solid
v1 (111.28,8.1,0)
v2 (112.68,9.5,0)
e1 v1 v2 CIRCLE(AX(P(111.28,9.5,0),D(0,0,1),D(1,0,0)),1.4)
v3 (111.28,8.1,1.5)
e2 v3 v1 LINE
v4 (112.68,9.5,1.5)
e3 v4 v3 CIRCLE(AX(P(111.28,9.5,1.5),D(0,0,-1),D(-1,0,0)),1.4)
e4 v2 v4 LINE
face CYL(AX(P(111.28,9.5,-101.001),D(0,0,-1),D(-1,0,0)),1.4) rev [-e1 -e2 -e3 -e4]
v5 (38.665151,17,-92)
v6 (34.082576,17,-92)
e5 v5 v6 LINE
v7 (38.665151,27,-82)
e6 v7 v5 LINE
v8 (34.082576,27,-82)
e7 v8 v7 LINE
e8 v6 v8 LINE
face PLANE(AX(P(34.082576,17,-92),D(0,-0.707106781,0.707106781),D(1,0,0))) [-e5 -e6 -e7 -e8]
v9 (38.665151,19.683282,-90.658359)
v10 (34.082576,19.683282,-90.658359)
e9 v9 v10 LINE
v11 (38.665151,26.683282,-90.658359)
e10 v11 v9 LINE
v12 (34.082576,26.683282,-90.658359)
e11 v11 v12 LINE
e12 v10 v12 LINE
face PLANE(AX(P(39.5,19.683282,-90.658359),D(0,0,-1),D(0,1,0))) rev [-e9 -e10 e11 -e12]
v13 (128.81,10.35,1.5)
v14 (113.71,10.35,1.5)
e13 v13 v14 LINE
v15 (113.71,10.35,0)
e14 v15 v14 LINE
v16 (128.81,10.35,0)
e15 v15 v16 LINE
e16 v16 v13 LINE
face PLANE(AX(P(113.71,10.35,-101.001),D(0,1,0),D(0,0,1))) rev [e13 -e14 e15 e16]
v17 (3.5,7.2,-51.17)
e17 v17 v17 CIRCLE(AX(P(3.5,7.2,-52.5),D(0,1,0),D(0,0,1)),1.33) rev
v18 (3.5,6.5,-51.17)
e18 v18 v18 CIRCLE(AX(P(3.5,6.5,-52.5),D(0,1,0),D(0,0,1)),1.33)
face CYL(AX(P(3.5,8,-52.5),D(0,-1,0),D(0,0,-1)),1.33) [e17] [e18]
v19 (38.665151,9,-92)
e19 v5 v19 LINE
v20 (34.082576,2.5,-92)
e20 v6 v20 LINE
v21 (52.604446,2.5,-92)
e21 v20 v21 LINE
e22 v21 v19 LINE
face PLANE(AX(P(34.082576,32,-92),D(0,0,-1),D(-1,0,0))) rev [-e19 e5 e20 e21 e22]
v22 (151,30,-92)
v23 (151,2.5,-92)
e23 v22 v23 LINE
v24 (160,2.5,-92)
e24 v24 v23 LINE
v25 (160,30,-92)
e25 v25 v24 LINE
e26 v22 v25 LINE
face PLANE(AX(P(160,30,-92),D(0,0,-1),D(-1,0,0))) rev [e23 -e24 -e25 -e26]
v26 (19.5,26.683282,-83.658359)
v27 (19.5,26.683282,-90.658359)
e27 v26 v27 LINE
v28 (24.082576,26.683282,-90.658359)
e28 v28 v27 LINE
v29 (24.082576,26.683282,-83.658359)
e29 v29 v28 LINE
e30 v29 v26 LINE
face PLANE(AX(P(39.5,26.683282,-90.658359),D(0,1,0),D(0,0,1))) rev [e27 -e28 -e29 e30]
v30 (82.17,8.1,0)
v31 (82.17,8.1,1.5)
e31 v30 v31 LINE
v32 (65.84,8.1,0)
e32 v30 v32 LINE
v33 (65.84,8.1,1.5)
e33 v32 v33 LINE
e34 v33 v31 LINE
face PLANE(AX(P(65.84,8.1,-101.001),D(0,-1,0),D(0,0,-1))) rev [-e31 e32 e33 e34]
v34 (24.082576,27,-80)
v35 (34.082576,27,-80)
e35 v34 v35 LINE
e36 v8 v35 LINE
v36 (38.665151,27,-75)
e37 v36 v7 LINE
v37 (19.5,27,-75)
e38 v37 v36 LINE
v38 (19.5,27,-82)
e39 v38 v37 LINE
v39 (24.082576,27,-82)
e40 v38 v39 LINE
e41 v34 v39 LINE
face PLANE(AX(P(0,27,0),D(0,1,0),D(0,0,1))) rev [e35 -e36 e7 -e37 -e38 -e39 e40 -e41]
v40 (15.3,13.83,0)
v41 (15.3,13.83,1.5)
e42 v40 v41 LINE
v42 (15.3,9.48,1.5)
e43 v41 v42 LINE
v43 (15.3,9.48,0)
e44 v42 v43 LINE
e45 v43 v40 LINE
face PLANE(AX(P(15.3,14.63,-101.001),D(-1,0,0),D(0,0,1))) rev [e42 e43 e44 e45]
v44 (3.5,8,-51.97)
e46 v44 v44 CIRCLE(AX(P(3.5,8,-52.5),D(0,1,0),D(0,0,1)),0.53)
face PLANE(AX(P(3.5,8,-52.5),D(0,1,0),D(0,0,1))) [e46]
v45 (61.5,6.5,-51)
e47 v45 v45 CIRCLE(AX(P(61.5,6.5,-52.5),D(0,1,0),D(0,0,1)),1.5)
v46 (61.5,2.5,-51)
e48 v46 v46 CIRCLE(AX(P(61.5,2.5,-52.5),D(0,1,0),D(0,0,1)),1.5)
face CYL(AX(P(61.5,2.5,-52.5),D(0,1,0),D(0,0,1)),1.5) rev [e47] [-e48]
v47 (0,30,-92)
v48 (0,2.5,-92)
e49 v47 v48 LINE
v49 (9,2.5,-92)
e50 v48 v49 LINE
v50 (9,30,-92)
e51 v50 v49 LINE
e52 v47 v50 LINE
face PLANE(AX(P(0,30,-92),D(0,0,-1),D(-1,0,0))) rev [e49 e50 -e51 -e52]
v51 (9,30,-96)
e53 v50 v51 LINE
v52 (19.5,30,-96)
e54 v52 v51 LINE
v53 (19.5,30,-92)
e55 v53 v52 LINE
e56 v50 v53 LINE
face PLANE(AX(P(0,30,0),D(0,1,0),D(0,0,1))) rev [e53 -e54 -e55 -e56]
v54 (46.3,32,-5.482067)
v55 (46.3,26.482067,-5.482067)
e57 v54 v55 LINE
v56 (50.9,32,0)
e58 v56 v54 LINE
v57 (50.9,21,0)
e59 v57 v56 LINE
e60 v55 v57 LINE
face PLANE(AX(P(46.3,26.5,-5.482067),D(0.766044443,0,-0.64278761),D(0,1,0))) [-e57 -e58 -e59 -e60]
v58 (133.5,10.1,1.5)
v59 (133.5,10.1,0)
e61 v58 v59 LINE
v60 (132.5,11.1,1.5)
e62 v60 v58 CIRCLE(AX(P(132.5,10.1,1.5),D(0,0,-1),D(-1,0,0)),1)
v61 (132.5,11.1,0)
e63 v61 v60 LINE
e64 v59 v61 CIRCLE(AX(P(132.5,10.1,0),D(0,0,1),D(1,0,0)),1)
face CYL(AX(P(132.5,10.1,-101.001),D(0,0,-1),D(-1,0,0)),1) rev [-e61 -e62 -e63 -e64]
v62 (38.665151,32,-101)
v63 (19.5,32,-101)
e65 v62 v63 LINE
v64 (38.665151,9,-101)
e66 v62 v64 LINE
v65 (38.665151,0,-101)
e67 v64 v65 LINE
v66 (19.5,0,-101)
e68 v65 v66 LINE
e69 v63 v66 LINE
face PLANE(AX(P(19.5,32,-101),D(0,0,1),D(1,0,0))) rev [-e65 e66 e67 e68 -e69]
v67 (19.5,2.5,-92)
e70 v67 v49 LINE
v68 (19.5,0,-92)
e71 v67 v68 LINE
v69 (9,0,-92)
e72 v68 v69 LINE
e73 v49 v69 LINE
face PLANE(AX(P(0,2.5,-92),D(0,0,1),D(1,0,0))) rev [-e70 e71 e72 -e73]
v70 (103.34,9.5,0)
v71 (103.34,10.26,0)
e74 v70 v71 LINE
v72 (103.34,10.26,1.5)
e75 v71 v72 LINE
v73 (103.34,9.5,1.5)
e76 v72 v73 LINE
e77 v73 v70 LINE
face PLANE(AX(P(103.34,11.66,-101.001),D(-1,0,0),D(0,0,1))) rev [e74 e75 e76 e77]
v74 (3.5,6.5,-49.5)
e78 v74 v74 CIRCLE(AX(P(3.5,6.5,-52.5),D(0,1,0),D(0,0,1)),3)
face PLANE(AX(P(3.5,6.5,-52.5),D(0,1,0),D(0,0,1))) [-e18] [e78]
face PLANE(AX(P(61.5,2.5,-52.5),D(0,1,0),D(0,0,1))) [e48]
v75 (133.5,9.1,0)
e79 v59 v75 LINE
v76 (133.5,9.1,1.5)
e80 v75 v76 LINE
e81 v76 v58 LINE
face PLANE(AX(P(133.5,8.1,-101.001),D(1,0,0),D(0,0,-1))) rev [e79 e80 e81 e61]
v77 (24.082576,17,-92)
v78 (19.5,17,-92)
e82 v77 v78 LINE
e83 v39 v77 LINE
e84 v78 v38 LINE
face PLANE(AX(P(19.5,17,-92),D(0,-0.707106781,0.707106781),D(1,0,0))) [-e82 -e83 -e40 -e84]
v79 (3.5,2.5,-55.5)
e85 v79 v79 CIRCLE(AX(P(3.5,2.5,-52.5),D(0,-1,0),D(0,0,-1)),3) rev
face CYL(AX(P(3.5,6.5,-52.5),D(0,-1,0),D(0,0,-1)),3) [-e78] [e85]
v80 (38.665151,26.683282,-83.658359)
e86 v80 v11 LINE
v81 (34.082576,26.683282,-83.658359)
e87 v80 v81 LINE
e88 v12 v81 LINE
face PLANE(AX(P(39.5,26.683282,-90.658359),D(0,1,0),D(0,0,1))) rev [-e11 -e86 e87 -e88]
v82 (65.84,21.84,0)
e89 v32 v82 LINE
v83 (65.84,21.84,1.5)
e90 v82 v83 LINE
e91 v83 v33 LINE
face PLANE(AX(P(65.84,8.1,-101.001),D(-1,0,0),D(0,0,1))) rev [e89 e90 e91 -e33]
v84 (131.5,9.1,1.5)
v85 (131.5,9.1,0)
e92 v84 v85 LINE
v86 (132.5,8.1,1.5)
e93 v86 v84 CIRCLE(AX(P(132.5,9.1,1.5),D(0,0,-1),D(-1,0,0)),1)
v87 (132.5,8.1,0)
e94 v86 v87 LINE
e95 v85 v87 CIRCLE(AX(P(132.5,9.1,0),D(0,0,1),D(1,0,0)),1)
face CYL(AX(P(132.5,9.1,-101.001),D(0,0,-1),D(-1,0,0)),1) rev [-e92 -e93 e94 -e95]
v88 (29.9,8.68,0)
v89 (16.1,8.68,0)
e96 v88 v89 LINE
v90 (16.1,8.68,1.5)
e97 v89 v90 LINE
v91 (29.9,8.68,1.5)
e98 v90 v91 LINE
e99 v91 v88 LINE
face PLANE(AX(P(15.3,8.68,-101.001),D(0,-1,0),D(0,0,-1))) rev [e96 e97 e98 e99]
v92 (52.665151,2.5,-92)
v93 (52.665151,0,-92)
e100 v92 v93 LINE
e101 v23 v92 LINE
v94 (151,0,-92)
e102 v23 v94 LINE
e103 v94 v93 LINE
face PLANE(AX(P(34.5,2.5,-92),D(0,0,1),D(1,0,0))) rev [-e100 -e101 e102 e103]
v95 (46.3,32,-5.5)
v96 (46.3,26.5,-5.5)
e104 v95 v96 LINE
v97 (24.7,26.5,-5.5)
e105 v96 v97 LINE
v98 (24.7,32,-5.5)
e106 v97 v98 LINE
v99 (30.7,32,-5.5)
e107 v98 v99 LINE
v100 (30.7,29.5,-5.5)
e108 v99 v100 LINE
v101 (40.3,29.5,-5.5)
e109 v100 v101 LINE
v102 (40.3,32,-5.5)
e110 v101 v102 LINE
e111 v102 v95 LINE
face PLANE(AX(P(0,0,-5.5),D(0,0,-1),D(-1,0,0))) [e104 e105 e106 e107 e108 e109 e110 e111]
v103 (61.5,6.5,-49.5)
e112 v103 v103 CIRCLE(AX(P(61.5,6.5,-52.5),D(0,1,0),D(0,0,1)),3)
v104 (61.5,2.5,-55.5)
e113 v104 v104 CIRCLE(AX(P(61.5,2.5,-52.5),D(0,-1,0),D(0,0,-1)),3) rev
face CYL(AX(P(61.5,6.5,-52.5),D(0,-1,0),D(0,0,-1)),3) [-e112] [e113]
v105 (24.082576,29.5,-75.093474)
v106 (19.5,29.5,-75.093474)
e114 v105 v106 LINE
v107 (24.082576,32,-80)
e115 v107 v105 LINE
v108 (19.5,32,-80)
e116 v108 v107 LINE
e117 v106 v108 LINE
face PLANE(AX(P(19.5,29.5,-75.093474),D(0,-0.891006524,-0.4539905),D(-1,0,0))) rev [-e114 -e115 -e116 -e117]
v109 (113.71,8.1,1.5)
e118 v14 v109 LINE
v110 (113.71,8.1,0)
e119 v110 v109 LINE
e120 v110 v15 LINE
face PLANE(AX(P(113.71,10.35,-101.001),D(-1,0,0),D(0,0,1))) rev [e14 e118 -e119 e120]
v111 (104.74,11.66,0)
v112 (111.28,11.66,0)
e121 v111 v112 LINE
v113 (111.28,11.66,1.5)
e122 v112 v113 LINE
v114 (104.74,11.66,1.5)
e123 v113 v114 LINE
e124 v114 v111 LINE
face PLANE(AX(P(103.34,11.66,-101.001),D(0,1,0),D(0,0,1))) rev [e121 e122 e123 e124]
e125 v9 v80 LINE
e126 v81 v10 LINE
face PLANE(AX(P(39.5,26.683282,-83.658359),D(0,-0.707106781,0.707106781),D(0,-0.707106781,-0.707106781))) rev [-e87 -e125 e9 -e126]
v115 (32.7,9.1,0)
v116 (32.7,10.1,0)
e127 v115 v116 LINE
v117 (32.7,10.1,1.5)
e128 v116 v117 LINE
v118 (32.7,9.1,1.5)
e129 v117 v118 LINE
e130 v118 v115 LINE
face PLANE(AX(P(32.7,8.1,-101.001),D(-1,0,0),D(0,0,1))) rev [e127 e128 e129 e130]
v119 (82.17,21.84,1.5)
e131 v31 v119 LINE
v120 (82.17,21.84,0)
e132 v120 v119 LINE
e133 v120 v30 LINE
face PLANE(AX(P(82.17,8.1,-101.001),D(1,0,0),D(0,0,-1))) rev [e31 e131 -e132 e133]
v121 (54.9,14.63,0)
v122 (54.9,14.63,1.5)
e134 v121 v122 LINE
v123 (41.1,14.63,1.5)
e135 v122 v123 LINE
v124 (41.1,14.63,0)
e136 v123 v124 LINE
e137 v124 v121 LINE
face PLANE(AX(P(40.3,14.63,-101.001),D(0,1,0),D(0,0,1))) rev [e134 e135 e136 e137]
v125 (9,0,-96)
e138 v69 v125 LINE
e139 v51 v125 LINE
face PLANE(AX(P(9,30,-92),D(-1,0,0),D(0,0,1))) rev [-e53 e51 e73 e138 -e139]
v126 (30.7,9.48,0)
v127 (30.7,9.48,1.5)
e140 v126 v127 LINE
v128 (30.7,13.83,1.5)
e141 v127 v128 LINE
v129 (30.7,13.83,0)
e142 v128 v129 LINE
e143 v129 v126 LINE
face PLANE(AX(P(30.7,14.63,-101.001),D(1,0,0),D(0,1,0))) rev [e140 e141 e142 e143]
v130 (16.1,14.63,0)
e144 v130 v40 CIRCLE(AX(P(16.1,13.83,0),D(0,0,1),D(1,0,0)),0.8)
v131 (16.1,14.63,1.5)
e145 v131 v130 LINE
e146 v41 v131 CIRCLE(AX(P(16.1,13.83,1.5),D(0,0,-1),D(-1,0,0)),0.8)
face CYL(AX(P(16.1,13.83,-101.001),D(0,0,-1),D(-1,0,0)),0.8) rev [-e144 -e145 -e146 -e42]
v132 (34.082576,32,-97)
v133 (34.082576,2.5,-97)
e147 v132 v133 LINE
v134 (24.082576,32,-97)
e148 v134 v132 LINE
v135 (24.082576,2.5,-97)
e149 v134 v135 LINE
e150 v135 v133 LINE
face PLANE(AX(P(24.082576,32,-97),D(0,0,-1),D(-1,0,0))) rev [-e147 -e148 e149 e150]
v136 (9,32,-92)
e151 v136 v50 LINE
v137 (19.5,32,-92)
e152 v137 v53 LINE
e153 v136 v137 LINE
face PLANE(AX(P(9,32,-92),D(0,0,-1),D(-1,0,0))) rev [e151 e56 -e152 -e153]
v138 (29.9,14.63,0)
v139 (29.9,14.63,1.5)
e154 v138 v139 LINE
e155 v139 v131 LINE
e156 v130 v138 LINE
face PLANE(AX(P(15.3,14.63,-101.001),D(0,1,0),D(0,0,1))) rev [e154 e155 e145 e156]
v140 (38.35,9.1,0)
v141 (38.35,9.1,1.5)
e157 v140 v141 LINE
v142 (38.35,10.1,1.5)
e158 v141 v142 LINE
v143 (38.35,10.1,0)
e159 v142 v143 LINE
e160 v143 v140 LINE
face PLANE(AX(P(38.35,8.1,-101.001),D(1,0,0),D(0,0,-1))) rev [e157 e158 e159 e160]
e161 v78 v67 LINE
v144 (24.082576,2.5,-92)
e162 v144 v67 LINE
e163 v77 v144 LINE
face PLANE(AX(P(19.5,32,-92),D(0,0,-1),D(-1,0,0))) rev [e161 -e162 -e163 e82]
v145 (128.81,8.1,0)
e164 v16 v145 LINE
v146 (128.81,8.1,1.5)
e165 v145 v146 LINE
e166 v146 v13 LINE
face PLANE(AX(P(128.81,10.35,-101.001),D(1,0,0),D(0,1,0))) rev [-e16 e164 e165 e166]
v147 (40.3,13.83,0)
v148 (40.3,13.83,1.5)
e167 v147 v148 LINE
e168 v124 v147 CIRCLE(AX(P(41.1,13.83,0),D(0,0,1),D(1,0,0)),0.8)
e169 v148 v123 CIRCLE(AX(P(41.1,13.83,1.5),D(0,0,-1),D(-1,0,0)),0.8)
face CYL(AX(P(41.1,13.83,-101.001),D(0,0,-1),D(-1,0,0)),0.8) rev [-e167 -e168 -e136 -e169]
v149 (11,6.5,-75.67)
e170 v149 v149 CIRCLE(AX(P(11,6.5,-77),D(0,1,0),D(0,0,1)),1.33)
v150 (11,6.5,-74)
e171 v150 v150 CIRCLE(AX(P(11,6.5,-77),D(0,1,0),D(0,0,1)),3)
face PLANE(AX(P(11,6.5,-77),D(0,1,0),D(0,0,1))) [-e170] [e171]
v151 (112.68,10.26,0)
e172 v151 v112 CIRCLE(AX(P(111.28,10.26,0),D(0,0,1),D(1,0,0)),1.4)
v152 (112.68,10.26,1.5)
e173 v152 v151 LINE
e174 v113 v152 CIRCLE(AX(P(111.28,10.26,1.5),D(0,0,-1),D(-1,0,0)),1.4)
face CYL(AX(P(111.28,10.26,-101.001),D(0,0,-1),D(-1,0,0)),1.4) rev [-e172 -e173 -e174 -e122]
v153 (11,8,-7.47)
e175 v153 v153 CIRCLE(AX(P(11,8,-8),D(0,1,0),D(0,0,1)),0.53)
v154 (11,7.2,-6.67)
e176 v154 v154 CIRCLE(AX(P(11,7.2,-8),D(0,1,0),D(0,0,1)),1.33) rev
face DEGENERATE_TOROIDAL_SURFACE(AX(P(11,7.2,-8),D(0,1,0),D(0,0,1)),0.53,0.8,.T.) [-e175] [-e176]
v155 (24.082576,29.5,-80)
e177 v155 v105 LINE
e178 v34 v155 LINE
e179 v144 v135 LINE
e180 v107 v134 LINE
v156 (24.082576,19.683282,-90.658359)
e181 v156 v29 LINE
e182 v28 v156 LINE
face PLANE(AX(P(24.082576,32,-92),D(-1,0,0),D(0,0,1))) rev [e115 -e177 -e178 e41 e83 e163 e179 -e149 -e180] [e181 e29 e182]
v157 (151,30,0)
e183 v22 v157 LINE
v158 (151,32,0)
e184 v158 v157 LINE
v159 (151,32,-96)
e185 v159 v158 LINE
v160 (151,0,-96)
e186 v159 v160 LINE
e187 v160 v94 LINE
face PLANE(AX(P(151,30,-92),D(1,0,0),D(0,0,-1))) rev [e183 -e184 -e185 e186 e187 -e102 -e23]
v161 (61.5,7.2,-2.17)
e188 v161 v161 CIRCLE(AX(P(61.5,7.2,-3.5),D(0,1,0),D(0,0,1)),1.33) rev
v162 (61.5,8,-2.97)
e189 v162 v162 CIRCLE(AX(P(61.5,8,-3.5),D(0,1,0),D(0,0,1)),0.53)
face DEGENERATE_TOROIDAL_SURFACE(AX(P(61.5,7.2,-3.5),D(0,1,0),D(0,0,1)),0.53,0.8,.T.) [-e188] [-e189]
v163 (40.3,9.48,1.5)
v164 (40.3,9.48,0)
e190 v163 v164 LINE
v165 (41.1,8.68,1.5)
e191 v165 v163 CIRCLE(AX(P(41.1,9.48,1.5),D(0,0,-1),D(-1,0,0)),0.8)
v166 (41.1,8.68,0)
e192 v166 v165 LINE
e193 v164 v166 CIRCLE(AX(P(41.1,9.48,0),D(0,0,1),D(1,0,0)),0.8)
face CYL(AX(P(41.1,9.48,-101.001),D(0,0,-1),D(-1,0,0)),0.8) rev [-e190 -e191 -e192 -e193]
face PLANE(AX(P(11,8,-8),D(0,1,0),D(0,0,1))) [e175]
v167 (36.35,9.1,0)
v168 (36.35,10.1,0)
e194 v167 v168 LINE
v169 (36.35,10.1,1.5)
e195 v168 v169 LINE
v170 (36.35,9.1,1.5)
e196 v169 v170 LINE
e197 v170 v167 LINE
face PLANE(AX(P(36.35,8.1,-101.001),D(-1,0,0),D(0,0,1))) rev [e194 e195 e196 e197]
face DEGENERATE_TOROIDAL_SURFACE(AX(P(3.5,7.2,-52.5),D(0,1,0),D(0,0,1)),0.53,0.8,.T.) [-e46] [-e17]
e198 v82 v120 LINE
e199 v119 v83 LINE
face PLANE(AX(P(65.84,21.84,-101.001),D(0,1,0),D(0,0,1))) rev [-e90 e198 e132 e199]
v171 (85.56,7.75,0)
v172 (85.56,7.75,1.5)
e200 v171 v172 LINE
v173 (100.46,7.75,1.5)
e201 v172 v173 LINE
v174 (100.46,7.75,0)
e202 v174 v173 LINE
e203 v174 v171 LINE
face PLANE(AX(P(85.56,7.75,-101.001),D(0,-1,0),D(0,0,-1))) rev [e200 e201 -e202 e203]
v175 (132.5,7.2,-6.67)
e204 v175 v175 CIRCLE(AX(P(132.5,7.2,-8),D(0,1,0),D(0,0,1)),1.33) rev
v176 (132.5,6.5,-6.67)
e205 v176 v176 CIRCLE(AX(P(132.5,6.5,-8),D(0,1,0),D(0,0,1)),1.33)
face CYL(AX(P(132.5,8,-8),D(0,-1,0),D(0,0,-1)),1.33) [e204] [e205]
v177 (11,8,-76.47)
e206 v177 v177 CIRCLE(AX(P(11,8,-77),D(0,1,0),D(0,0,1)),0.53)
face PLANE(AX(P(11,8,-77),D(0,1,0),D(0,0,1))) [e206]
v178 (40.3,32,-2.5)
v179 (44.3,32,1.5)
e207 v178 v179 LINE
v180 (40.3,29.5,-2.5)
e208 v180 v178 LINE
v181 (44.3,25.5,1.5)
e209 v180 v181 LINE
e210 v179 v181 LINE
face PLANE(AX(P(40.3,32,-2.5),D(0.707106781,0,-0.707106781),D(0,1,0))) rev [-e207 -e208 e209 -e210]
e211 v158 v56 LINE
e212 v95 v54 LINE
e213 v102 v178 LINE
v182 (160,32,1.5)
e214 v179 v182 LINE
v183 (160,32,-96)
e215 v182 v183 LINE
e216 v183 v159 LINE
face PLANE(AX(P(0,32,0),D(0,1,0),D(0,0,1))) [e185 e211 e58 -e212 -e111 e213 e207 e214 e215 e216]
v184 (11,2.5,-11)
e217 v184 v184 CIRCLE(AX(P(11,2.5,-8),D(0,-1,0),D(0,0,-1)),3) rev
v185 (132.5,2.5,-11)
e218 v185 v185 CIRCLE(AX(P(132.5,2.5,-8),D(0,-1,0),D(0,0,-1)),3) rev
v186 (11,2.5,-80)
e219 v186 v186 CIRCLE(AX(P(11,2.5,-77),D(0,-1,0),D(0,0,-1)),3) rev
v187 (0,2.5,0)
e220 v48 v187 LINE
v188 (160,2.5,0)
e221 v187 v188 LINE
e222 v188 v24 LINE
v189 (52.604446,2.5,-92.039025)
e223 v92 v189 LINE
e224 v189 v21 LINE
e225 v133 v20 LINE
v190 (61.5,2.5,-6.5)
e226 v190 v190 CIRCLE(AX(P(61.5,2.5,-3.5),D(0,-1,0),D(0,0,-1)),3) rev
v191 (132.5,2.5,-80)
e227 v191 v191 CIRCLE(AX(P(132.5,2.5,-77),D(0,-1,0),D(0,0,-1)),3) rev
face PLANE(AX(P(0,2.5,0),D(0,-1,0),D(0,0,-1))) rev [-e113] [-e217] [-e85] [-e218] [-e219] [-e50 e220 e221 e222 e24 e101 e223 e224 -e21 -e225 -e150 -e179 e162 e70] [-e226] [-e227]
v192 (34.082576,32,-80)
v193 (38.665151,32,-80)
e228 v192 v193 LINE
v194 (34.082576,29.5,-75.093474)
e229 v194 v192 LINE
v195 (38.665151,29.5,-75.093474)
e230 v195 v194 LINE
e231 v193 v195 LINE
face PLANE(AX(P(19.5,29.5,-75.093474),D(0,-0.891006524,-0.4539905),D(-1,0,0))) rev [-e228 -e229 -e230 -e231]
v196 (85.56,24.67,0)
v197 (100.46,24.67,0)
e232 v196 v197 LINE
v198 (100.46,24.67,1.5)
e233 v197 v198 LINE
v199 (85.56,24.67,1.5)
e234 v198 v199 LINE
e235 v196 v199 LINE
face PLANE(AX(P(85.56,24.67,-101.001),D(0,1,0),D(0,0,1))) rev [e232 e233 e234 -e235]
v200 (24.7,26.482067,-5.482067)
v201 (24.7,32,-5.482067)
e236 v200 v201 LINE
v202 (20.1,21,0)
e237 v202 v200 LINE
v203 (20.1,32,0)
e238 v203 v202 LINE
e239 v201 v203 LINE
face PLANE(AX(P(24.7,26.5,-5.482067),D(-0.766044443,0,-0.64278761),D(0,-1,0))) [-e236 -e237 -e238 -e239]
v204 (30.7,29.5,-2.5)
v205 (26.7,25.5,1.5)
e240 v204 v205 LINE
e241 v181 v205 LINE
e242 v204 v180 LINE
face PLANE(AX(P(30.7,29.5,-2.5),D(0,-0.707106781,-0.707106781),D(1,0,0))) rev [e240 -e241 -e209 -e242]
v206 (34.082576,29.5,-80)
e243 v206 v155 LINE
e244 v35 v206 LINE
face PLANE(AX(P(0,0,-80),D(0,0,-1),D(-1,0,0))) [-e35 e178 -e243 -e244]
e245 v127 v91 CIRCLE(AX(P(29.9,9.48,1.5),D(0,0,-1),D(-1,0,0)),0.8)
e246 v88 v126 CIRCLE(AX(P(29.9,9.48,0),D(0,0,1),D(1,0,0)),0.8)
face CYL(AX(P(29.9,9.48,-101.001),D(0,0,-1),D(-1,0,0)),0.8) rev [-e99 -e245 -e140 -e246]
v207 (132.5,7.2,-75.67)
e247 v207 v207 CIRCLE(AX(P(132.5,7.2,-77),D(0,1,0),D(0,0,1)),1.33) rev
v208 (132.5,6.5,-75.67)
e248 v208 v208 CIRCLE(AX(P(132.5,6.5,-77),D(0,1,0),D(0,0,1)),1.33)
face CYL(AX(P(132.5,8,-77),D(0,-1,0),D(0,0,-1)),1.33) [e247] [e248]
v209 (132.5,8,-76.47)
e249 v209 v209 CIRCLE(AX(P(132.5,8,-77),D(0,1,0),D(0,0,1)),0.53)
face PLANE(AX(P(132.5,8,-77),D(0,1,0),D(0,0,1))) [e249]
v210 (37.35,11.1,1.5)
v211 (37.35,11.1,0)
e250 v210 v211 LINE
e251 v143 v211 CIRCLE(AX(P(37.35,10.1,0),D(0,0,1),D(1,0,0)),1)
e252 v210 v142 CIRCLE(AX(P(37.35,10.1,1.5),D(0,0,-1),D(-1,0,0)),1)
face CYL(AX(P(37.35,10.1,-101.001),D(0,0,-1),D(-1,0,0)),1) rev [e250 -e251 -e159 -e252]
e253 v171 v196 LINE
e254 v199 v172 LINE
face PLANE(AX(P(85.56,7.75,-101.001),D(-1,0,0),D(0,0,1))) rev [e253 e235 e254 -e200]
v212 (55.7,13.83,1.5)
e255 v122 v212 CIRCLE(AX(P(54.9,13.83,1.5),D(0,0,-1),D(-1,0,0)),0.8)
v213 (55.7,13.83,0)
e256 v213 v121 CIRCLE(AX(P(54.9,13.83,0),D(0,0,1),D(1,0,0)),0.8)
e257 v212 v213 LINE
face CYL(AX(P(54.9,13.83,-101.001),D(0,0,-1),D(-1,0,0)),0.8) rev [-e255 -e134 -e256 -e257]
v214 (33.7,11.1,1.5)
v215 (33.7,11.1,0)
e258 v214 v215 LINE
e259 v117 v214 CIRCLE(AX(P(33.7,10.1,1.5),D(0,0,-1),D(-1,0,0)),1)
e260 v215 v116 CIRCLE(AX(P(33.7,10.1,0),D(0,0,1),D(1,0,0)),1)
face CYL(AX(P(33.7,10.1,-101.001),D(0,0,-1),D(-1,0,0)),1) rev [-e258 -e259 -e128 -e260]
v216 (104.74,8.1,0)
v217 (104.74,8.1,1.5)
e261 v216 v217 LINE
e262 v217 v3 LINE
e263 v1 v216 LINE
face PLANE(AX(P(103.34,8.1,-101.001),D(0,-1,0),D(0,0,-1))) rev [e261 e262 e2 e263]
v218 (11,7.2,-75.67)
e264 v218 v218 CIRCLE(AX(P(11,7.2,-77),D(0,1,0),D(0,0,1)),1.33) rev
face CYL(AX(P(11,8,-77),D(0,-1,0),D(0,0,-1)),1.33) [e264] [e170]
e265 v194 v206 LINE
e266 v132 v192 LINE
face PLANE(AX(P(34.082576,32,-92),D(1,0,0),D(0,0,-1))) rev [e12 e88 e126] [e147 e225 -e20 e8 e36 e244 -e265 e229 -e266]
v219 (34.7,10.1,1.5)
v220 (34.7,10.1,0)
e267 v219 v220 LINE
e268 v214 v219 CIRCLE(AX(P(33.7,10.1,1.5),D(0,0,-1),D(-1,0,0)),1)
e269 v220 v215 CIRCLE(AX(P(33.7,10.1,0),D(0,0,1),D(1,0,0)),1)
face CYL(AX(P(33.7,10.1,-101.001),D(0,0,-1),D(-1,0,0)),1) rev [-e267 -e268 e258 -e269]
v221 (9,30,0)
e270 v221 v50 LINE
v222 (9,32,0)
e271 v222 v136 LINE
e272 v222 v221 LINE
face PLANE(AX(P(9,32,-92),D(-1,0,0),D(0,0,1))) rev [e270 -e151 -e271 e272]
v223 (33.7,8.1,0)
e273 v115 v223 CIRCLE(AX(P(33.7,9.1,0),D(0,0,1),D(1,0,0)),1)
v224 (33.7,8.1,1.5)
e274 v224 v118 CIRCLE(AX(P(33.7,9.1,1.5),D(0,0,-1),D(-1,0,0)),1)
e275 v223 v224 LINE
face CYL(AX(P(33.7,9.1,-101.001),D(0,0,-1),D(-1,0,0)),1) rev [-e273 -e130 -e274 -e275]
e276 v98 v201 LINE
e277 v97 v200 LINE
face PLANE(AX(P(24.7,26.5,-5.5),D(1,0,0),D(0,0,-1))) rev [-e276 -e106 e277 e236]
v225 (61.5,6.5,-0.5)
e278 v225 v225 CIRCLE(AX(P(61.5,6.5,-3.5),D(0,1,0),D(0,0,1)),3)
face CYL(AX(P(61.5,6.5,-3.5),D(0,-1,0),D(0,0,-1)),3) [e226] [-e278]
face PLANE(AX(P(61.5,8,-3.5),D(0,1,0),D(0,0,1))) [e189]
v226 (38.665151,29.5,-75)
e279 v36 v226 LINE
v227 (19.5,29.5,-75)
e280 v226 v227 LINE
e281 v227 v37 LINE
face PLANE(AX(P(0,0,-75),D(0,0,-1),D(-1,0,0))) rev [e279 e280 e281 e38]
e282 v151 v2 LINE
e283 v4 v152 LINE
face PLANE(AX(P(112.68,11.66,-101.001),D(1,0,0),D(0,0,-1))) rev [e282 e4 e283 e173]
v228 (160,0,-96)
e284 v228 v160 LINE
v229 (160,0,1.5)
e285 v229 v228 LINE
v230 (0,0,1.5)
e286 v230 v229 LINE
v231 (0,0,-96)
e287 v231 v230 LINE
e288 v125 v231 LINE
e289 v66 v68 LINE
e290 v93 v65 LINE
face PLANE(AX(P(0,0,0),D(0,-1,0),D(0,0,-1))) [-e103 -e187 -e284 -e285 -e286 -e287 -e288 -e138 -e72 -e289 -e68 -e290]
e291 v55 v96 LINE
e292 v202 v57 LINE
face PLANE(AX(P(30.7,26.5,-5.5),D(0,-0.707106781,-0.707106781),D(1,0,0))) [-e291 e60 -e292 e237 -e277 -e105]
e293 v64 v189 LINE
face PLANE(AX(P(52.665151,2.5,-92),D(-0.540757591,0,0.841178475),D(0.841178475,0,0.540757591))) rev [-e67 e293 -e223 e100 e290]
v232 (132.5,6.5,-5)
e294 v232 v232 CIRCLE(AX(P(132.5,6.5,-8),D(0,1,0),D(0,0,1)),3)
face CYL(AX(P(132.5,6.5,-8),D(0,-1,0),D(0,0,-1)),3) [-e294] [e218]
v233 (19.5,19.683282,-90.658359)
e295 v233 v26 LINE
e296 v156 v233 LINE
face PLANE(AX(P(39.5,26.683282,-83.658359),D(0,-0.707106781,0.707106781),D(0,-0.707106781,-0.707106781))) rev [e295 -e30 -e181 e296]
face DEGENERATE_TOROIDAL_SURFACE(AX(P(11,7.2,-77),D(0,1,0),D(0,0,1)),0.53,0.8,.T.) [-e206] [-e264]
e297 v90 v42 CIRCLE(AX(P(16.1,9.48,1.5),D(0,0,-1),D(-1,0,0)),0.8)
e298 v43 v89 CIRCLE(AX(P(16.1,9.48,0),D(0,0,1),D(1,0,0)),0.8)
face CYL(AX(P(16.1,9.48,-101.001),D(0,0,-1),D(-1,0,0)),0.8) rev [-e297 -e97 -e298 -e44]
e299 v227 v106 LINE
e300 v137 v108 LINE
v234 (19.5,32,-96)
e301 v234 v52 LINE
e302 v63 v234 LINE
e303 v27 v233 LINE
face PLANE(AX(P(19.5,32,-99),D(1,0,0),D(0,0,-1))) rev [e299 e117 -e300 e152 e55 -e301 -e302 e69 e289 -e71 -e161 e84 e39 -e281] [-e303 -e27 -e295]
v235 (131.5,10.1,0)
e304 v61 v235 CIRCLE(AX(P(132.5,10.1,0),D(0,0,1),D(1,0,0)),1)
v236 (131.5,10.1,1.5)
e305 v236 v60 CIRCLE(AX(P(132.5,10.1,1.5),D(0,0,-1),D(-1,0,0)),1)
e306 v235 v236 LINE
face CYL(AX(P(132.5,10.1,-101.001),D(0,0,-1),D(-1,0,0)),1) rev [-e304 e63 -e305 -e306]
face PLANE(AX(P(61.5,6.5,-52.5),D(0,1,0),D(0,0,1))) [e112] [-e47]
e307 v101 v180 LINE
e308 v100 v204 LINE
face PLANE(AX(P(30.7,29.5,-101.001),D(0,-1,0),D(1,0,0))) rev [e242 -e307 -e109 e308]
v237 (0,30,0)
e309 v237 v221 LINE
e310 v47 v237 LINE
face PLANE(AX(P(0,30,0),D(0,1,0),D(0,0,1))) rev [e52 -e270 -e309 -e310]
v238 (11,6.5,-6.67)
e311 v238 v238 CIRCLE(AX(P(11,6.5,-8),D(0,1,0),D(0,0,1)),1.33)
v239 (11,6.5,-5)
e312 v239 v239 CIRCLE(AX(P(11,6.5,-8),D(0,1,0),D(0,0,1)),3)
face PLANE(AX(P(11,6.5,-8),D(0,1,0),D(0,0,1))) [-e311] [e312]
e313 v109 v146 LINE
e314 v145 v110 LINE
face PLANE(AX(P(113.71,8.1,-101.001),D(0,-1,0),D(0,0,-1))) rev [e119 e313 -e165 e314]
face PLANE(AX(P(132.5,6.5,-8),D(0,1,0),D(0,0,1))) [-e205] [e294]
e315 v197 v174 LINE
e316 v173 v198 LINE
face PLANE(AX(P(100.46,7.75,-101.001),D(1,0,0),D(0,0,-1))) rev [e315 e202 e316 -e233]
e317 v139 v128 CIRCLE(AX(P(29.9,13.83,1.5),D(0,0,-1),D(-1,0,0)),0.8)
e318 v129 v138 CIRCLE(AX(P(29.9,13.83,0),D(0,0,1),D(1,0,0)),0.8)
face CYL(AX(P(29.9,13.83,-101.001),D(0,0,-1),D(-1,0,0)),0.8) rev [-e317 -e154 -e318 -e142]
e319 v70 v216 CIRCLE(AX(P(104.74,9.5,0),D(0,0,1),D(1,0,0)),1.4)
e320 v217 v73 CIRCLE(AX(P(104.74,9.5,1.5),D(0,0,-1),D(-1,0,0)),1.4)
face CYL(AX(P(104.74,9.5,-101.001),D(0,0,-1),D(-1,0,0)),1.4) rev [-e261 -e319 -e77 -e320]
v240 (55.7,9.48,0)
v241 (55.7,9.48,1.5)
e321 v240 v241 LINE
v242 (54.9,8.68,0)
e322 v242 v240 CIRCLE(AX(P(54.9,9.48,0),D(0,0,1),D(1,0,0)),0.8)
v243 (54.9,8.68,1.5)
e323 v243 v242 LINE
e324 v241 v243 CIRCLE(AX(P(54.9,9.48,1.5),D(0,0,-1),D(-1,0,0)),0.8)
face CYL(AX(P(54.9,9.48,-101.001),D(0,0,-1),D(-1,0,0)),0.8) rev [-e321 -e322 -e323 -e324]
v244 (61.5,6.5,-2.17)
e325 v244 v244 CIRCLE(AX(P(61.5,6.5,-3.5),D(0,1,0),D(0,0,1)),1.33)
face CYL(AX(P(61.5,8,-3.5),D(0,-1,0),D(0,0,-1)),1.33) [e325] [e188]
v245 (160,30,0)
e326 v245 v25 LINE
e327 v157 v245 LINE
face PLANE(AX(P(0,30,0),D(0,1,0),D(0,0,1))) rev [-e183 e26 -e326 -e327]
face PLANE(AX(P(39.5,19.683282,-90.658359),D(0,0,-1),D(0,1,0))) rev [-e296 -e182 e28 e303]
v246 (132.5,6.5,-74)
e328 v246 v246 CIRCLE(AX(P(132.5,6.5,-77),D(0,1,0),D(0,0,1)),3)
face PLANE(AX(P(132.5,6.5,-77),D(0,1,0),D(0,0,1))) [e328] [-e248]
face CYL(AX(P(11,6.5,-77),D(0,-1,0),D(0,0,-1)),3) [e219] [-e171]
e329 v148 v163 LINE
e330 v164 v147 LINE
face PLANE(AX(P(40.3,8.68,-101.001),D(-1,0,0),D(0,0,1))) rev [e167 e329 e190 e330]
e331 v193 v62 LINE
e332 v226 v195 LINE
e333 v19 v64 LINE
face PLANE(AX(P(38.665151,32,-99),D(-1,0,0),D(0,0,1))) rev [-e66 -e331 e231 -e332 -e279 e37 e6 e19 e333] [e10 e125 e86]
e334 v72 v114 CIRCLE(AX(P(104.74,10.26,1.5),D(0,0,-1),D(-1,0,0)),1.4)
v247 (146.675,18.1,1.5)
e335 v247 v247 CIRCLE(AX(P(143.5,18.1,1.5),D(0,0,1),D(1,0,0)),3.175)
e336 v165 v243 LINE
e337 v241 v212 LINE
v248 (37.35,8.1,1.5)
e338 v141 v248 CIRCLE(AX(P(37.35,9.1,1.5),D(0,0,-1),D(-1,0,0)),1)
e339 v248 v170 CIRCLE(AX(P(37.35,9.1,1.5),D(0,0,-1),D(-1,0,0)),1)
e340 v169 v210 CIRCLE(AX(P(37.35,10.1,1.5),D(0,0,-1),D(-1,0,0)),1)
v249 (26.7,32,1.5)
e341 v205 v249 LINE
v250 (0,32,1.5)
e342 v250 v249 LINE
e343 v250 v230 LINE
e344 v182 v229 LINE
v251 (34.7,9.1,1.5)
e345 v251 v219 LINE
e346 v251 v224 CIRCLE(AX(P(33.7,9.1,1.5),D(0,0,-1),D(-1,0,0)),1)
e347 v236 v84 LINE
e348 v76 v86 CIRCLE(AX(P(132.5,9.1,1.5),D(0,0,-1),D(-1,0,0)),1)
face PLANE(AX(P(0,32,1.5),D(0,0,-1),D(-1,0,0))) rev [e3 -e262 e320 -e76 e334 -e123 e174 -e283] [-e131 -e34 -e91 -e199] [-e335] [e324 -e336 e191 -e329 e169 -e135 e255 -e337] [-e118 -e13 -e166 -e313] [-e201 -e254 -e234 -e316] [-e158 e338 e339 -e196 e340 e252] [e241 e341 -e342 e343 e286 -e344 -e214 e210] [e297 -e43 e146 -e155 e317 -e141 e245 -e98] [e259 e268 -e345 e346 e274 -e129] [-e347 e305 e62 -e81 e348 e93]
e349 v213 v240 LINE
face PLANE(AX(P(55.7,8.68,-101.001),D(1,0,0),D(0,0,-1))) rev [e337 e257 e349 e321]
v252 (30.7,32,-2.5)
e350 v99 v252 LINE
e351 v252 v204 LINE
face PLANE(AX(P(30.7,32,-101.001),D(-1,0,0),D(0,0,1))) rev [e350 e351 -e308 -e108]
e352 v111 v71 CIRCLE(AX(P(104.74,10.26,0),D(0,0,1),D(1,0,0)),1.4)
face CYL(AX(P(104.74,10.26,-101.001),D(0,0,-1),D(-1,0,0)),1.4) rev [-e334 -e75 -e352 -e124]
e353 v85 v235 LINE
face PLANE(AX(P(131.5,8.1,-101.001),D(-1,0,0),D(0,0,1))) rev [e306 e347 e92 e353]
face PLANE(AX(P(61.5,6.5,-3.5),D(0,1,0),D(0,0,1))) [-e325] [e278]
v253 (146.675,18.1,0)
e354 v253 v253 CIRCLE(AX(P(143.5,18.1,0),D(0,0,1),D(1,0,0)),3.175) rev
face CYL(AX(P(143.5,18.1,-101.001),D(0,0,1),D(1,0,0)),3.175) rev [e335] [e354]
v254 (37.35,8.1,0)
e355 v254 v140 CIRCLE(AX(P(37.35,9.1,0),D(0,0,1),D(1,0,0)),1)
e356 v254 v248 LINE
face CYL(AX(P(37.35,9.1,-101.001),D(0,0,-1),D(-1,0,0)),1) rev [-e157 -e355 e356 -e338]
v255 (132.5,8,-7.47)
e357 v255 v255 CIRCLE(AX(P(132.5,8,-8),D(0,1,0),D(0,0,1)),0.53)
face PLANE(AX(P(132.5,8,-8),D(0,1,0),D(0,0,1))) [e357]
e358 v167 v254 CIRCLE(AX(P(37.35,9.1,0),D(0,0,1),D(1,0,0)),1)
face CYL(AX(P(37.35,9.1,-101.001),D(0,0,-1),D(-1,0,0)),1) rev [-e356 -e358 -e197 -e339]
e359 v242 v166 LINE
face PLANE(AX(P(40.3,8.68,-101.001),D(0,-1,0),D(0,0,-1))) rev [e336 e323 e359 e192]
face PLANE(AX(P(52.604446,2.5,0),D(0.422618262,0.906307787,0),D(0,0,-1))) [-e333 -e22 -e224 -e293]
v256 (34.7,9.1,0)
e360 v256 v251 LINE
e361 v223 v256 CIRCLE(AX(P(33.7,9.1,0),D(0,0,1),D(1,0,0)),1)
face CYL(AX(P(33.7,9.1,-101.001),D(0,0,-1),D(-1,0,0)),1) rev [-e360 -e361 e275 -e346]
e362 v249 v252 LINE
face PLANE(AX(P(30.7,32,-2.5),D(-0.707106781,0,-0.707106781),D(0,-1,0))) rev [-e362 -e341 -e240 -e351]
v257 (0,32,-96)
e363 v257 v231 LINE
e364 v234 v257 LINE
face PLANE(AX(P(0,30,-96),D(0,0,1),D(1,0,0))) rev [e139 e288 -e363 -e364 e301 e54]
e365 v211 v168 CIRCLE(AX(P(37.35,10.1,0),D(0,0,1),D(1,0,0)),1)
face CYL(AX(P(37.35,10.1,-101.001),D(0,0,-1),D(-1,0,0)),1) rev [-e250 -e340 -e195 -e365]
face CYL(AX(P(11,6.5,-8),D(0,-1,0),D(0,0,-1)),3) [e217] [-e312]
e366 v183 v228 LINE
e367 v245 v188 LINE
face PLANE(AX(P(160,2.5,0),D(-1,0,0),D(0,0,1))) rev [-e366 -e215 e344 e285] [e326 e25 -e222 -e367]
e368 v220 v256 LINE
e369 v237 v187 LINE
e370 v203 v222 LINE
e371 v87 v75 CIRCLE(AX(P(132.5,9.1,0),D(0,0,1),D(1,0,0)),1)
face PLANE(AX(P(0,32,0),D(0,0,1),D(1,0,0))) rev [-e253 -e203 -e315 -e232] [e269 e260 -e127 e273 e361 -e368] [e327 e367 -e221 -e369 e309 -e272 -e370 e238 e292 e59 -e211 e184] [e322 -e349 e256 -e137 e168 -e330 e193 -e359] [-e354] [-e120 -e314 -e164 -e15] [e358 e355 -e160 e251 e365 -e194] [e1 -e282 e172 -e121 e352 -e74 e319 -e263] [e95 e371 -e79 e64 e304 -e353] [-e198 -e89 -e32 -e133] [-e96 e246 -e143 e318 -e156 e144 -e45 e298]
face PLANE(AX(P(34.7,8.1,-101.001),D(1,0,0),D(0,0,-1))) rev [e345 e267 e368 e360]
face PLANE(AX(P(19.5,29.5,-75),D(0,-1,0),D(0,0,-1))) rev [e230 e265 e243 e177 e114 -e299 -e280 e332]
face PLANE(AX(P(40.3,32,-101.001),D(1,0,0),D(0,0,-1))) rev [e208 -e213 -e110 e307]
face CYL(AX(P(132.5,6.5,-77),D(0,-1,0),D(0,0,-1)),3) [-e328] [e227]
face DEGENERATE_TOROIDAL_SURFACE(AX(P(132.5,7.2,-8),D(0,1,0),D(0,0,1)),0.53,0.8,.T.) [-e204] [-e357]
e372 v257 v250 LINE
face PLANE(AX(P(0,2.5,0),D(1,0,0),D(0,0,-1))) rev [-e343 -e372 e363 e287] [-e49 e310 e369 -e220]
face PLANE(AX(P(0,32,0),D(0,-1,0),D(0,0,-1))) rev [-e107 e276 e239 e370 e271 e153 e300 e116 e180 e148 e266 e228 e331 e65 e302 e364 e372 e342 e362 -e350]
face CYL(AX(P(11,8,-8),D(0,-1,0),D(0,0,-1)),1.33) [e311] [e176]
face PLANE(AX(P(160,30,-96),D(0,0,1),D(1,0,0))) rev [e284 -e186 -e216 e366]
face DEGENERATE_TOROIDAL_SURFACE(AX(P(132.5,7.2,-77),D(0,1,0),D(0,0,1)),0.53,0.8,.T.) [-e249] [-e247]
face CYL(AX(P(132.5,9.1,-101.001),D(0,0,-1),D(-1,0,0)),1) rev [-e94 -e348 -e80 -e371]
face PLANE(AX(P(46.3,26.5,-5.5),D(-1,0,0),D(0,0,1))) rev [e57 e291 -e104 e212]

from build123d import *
from OCP.BRepFilletAPI import BRepFilletAPI_MakeChamfer

# Parameters (mm, degrees)
BOSS_EXTRUDE1_DEPTH  = 2.5
SKETCH3_W            = 160
SKETCH3_H            = 1.5
BOSS_EXTRUDE2_DEPTH  = 32
SKETCH4_R            = 3
BOSS_EXTRUDE3_DEPTH  = 4
SKETCH6_R            = 1.33
BOSS_EXTRUDE5_DEPTH  = 1.5
SKETCH7_R            = 1.5
CUT_EXTRUDE1_DEPTH   = 4
BOSS_EXTRUDE6_DEPTH  = 32
BOSS_EXTRUDE7_DEPTH  = 2.5
CHAMFER2_SIZE        = 6.5
CHAMFER2_SIZE2       = 13.939294983
CUT_EXTRUDE2_REACH   = 194.692
SKETCH11_R           = 3.175
SKETCH11_W           = 15.4
SKETCH11_H           = 5.95
SKETCH11_W_2         = 16.33
SKETCH11_H_2         = 13.74
SKETCH11_W_3         = 14.9
SKETCH11_H_3         = 16.92
SKETCH11_W_4         = 9.34
SKETCH11_H_4         = 3.56
SKETCH11_W_5         = 15.1
SKETCH11_H_5         = 2.25
SKETCH11_W_6         = 2
SKETCH11_H_6         = 3
SKETCH11_W_7         = 9.6
SKETCH11_H_7         = 2.5
FILLET1_R            = 1.4
FILLET2_R            = 0.8
FILLET3_R            = 0.8
FILLET4_R            = 1
BOSS_EXTRUDE8_DEPTH  = 5.5
CHAMFER3_SIZE        = 5.5
CHAMFER4_SIZE        = 4.6
CHAMFER4_SIZE2       = 5.482066526
CHAMFER5_SIZE        = 4
SKETCH13_W           = 4.5825757
SKETCH13_H           = 12
SKETCH13_W_2         = 4.582575695
BOSS_EXTRUDE9_DEPTH  = 5
SKETCH16_W           = 19.16515139
SKETCH16_H           = 2.5
BOSS_EXTRUDE10_DEPTH = 5
CHAMFER6_SIZE        = 2.5
CHAMFER6_SIZE_2      = 4.906526264
CHAMFER7_SIZE        = 10
CUT_EXTRUDE3_DEPTH   = 20
SKETCH18_W           = 9
SKETCH18_H           = 4
BOSS_EXTRUDE11_DEPTH = 30
SKETCH19_W           = 9
SKETCH19_H           = 96
BOSS_EXTRUDE12_DEPTH = 2


with BuildPart() as part:
    # Sketch1 → Boss-Extrude1 (new body)
    with BuildSketch(Plane(origin=(0, 0, 0), x_dir=(1, 0, 0), z_dir=(0, 1, 0))):
        Polygon((34.5, 92), (160, 92), (160, 0), (0, 0), (0, 92), (24, 92), (24, 99), (34.5, 99), align=None)
    extrude(amount=BOSS_EXTRUDE1_DEPTH)

    # Sketch3 → Boss-Extrude2 (add)
    with BuildSketch(Plane(origin=(0, 0, 0), x_dir=(1, 0, 0), z_dir=(0, 1, 0))):
        with Locations((80, -0.75)):
            Rectangle(SKETCH3_W, SKETCH3_H)
    extrude(amount=BOSS_EXTRUDE2_DEPTH)

    # Sketch4 → Boss-Extrude3 (add)
    with BuildSketch(Plane(origin=(0, 2.5, 0), x_dir=(1, 0, 0), z_dir=(0, 1, 0))):
        with Locations(Location((11, 8, 0), (0, 0, 90))):
            Circle(SKETCH4_R)
        with Locations(Location((11, 77, 0), (0, 0, 90))):
            Circle(SKETCH4_R)
        with Locations(Location((61.5, 3.5, 0), (0, 0, 90))):
            Circle(SKETCH4_R)
        with Locations(Location((132.5, 8, 0), (0, 0, 90))):
            Circle(SKETCH4_R)
        with Locations(Location((132.5, 77, 0), (0, 0, 90))):
            Circle(SKETCH4_R)
        with Locations(Location((3.5, 52.5, 0), (0, 0, 90))):
            Circle(SKETCH4_R)
        with Locations(Location((61.5, 52.5, 0), (0, 0, 90))):
            Circle(SKETCH4_R)
    extrude(amount=BOSS_EXTRUDE3_DEPTH)

    # Sketch6 → Boss-Extrude5 (add)
    with BuildSketch(Plane(origin=(0, 6.5, 0), x_dir=(1, 0, 0), z_dir=(0, 1, 0))):
        with Locations(Location((11, 77, 0), (0, 0, 270))):
            Circle(SKETCH6_R)
        with Locations(Location((3.5, 52.5, 0), (0, 0, 270))):
            Circle(SKETCH6_R)
        with Locations(Location((11, 8, 0), (0, 0, 270))):
            Circle(SKETCH6_R)
        with Locations(Location((61.5, 3.5, 0), (0, 0, 270))):
            Circle(SKETCH6_R)
        with Locations(Location((132.5, 8, 0), (0, 0, 270))):
            Circle(SKETCH6_R)
        with Locations(Location((132.5, 77, 0), (0, 0, 270))):
            Circle(SKETCH6_R)
    extrude(amount=BOSS_EXTRUDE5_DEPTH)

    # Sketch7 → Cut-Extrude1 (cut)
    with BuildSketch(Plane(origin=(0, 6.5, 0), x_dir=(1, 0, 0), z_dir=(0, 1, 0))):
        with Locations(Location((61.5, 52.5, 0), (0, 0, 270))):
            Circle(SKETCH7_R)
    extrude(amount=-CUT_EXTRUDE1_DEPTH, mode=Mode.SUBTRACT)

    # Sketch8 → Boss-Extrude6 (add)
    with BuildSketch(Plane(origin=(0, 0, 0), x_dir=(1, 0, 0), z_dir=(0, 1, 0))):
        Polygon((19.5, 92), (24.082575695, 92), (24.082575695, 97), (34.082575695, 97), (34.082575695, 92), (38.66515139, 92), (38.66515139, 99), (38.66515139, 101), (19.5, 101), (19.5, 99), align=None)
    extrude(amount=BOSS_EXTRUDE6_DEPTH)

    # Sketch10 → Boss-Extrude7 (add)
    with BuildSketch(Plane(origin=(0, 0, 0), x_dir=(1, 0, 0), z_dir=(0, 1, 0))):
        Polygon((38.66515139, 101), (38.66515139, 92), (52.66515139, 92), align=None)
    extrude(amount=BOSS_EXTRUDE7_DEPTH)

    # Chamfer2
    chamfer2_edges = [part.edges().sort_by_distance(p)[0] for p in [
        (38.66515139, 2.5, -96.5),
    ]]
    chamfer2_side = [part.faces().sort_by_distance(p)[0] for p in [
        (38.66515139, 17.25, -96.5),
    ]]
    chamfer(chamfer2_edges, length=CHAMFER2_SIZE, length2=CHAMFER2_SIZE2, reference=chamfer2_side[0])

    # Sketch11 → Cut-Extrude2 (cut, up to next)
    with BuildSketch(Plane.XY.offset(1.5), mode=Mode.PRIVATE) as cut_extrude2_sk1:
        with Locations((143.5, 18.1)):
            Circle(SKETCH11_R)
    cut_extrude2_tool1 = extrude(cut_extrude2_sk1.sketch, amount=-CUT_EXTRUDE2_REACH, mode=Mode.PRIVATE) & part.part
    # Sketch11 → Cut-Extrude2 (cut, up to next)
    with BuildSketch(Plane.XY.offset(1.5), mode=Mode.PRIVATE) as cut_extrude2_sk2:
        with Locations((23, 11.655)):
            Rectangle(SKETCH11_W, SKETCH11_H)
    cut_extrude2_tool2 = extrude(cut_extrude2_sk2.sketch, amount=-CUT_EXTRUDE2_REACH, mode=Mode.PRIVATE) & part.part
    # Sketch11 → Cut-Extrude2 (cut, up to next)
    with BuildSketch(Plane.XY.offset(1.5), mode=Mode.PRIVATE) as cut_extrude2_sk3:
        with Locations((48, 11.655)):
            Rectangle(SKETCH11_W, SKETCH11_H)
    cut_extrude2_tool3 = extrude(cut_extrude2_sk3.sketch, amount=-CUT_EXTRUDE2_REACH, mode=Mode.PRIVATE) & part.part
    # Sketch11 → Cut-Extrude2 (cut, up to next)
    with BuildSketch(Plane.XY.offset(1.5), mode=Mode.PRIVATE) as cut_extrude2_sk4:
        with Locations((74.005, 14.97)):
            Rectangle(SKETCH11_W_2, SKETCH11_H_2)
    cut_extrude2_tool4 = extrude(cut_extrude2_sk4.sketch, amount=-CUT_EXTRUDE2_REACH, mode=Mode.PRIVATE) & part.part
    # Sketch11 → Cut-Extrude2 (cut, up to next)
    with BuildSketch(Plane.XY.offset(1.5), mode=Mode.PRIVATE) as cut_extrude2_sk5:
        with Locations((93.01, 16.21)):
            Rectangle(SKETCH11_W_3, SKETCH11_H_3)
    cut_extrude2_tool5 = extrude(cut_extrude2_sk5.sketch, amount=-CUT_EXTRUDE2_REACH, mode=Mode.PRIVATE) & part.part
    # Sketch11 → Cut-Extrude2 (cut, up to next)
    with BuildSketch(Plane.XY.offset(1.5), mode=Mode.PRIVATE) as cut_extrude2_sk6:
        with Locations((108.01, 9.88)):
            Rectangle(SKETCH11_W_4, SKETCH11_H_4)
    cut_extrude2_tool6 = extrude(cut_extrude2_sk6.sketch, amount=-CUT_EXTRUDE2_REACH, mode=Mode.PRIVATE) & part.part
    # Sketch11 → Cut-Extrude2 (cut, up to next)
    with BuildSketch(Plane.XY.offset(1.5), mode=Mode.PRIVATE) as cut_extrude2_sk7:
        with Locations((121.26, 9.225)):
            Rectangle(SKETCH11_W_5, SKETCH11_H_5)
    cut_extrude2_tool7 = extrude(cut_extrude2_sk7.sketch, amount=-CUT_EXTRUDE2_REACH, mode=Mode.PRIVATE) & part.part
    # Sketch11 → Cut-Extrude2 (cut, up to next)
    with BuildSketch(Plane.XY.offset(1.5), mode=Mode.PRIVATE) as cut_extrude2_sk8:
        with Locations((33.7, 9.6)):
            Rectangle(SKETCH11_W_6, SKETCH11_H_6)
    cut_extrude2_tool8 = extrude(cut_extrude2_sk8.sketch, amount=-CUT_EXTRUDE2_REACH, mode=Mode.PRIVATE) & part.part
    # Sketch11 → Cut-Extrude2 (cut, up to next)
    with BuildSketch(Plane.XY.offset(1.5), mode=Mode.PRIVATE) as cut_extrude2_sk9:
        with Locations((37.35, 9.6)):
            Rectangle(SKETCH11_W_6, SKETCH11_H_6)
    cut_extrude2_tool9 = extrude(cut_extrude2_sk9.sketch, amount=-CUT_EXTRUDE2_REACH, mode=Mode.PRIVATE) & part.part
    # Sketch11 → Cut-Extrude2 (cut, up to next)
    with BuildSketch(Plane.XY.offset(1.5), mode=Mode.PRIVATE) as cut_extrude2_sk10:
        with Locations((132.5, 9.6)):
            Rectangle(SKETCH11_W_6, SKETCH11_H_6)
    cut_extrude2_tool10 = extrude(cut_extrude2_sk10.sketch, amount=-CUT_EXTRUDE2_REACH, mode=Mode.PRIVATE) & part.part
    # Sketch11 → Cut-Extrude2 (cut, up to next)
    with BuildSketch(Plane.XY.offset(1.5), mode=Mode.PRIVATE) as cut_extrude2_sk11:
        with Locations((35.5, 30.75)):
            Rectangle(SKETCH11_W_7, SKETCH11_H_7)
    cut_extrude2_tool11 = extrude(cut_extrude2_sk11.sketch, amount=-CUT_EXTRUDE2_REACH, mode=Mode.PRIVATE) & part.part
    add(cut_extrude2_tool1.solids().sort_by_distance((143.5, 18.1, 1.5))[0], mode=Mode.SUBTRACT)
    add(cut_extrude2_tool2.solids().sort_by_distance((23, 11.655, 1.5))[0], mode=Mode.SUBTRACT)
    add(cut_extrude2_tool3.solids().sort_by_distance((48, 11.655, 1.5))[0], mode=Mode.SUBTRACT)
    add(cut_extrude2_tool4.solids().sort_by_distance((74.005, 14.97, 1.5))[0], mode=Mode.SUBTRACT)
    add(cut_extrude2_tool5.solids().sort_by_distance((93.01, 16.21, 1.5))[0], mode=Mode.SUBTRACT)
    add(cut_extrude2_tool6.solids().sort_by_distance((108.01, 9.88, 1.5))[0], mode=Mode.SUBTRACT)
    add(cut_extrude2_tool7.solids().sort_by_distance((121.26, 9.225, 1.5))[0], mode=Mode.SUBTRACT)
    add(cut_extrude2_tool8.solids().sort_by_distance((33.7, 9.6, 1.5))[0], mode=Mode.SUBTRACT)
    add(cut_extrude2_tool9.solids().sort_by_distance((37.35, 9.6, 1.5))[0], mode=Mode.SUBTRACT)
    add(cut_extrude2_tool10.solids().sort_by_distance((132.5, 9.6, 1.5))[0], mode=Mode.SUBTRACT)
    add(cut_extrude2_tool11.solids().sort_by_distance((35.5, 30.75, 1.5))[0], mode=Mode.SUBTRACT)

    # Fillet1
    fillet1_edges = [part.edges().sort_by_distance(p)[0] for p in [
        (103.34, 8.1, 0.75),
        (103.34, 11.66, 0.75),
        (112.68, 11.66, 0.75),
        (112.68, 8.1, 0.75),
    ]]
    fillet(fillet1_edges, radius=FILLET1_R)

    # Fillet2
    fillet2_edges = [part.edges().sort_by_distance(p)[0] for p in [
        (40.3, 8.68, 0.75),
        (40.3, 14.63, 0.75),
        (55.7, 14.63, 0.75),
        (55.7, 8.68, 0.75),
        (15.3, 8.68, 0.75),
        (15.3, 14.63, 0.75),
        (30.7, 14.63, 0.75),
        (30.7, 8.68, 0.75),
    ]]
    fillet(fillet2_edges, radius=FILLET2_R)

    # Fillet3
    fillet3_edges = [part.edges().sort_by_distance(p)[0] for p in [
        (11, 8, -78.33),
        (3.5, 8, -53.83),
        (11, 8, -9.33),
        (61.5, 8, -4.83),
        (132.5, 8, -9.33),
        (132.5, 8, -78.33),
    ]]
    fillet(fillet3_edges, radius=FILLET3_R)

    # Fillet4
    fillet4_edges = [part.edges().sort_by_distance(p)[0] for p in [
        (34.7, 8.1, 0.75),
        (38.35, 8.1, 0.75),
        (38.35, 11.1, 0.75),
        (34.7, 11.1, 0.75),
        (32.7, 8.1, 0.75),
        (36.35, 8.1, 0.75),
        (36.35, 11.1, 0.75),
        (32.7, 11.1, 0.75),
        (131.5, 11.1, 0.75),
        (133.5, 11.1, 0.75),
        (131.5, 8.1, 0.75),
        (133.5, 8.1, 0.75),
    ]]
    fillet(fillet4_edges, radius=FILLET4_R - 0.0001)  # a hair under: the kernel refuses the full size

    # Sketch12 → Boss-Extrude8 (add)
    with BuildSketch(Plane(origin=(0, 0, 0), x_dir=(-1, 0, 0), z_dir=(0, 0, -1))):
        Polygon((-40.3, 29.5), (-30.7, 29.5), (-30.7, 32), (-24.7, 32), (-24.7, 26.5), (-30.7, 26.5), (-40.3, 26.5), (-46.3, 26.5), (-46.3, 32), (-40.3, 32), align=None)
    extrude(amount=BOSS_EXTRUDE8_DEPTH)

    # Chamfer3
    chamfer3_edges = [part.edges().sort_by_distance(p)[0] for p in [
        (35.5, 26.5, 0),
    ]]
    chamfer(chamfer3_edges, length=CHAMFER3_SIZE - 0.0001)  # a hair under: the kernel refuses the full size

    # Chamfer4
    chamfer4_edges = [part.edges().sort_by_distance(p)[0] for p in [
        (46.3, 26.50005, 0),
        (24.7, 26.50005, 0),
    ]]
    chamfer4_side = [part.faces().sort_by_distance(p)[0] for p in [
        (83.404597231, 17.301616567, 0),
    ]]
    chamfer(chamfer4_edges, length=CHAMFER4_SIZE, length2=CHAMFER4_SIZE2, reference=chamfer4_side[0])

    # Chamfer5
    chamfer5_edges = [part.edges().sort_by_distance(p)[0] for p in [
        (30.7, 30.75, 1.5),
        (35.5, 29.5, 1.5),
        (40.3, 30.75, 1.5),
    ]]
    chamfer(chamfer5_edges, length=CHAMFER5_SIZE)

    # Sketch13 → Boss-Extrude9 (add)
    with BuildSketch(Plane(origin=(0, 32, 0), x_dir=(1, 0, 0), z_dir=(0, 1, 0))):
        with Locations((21.79128785, 86)):
            Rectangle(SKETCH13_W, SKETCH13_H)
        with Locations((36.373863543, 86)):
            Rectangle(SKETCH13_W_2, SKETCH13_H)
    extrude(amount=-BOSS_EXTRUDE9_DEPTH)

    # Sketch16 → Boss-Extrude10 (add)
    with BuildSketch(Plane.XY.offset(-80)):
        with Locations((29.082575695, 28.25)):
            Rectangle(SKETCH16_W, SKETCH16_H)
    extrude(amount=BOSS_EXTRUDE10_DEPTH)

    # Chamfer6
    chamfer6_edges_1 = [part.edges().sort_by_distance(p)[0] for p in [
        (21.79128785, 29.5, -80),
    ]]
    chamfer6_side_1 = [part.faces().sort_by_distance(p)[0] for p in [
        (21.79128785, 29.55, -80),
    ]]
    chamfer6_edges_2 = [part.edges().sort_by_distance(p)[0] for p in [
        (36.373863542, 29.5, -80),
    ]]
    chamfer6_side_2 = [part.faces().sort_by_distance(p)[0] for p in [
        (36.373863542, 29.55, -80),
    ]]
    chamfer6 = BRepFilletAPI_MakeChamfer(part.part.solid().wrapped)
    for e in chamfer6_edges_1:
        chamfer6.Add(CHAMFER6_SIZE - 0.0001, CHAMFER6_SIZE_2 - 0.0001, e.wrapped, chamfer6_side_1[0].wrapped)
    for e in chamfer6_edges_2:
        chamfer6.Add(CHAMFER6_SIZE - 0.0001, CHAMFER6_SIZE_2 - 0.0001, e.wrapped, chamfer6_side_2[0].wrapped)
    add(Compound.cast(chamfer6.Shape()), mode=Mode.REPLACE)  # a hair under: the kernel refuses the full size

    # Chamfer7
    chamfer7_edges = [part.edges().sort_by_distance(p)[0] for p in [
        (36.373863542, 27, -92),
        (21.79128785, 27, -92),
    ]]
    chamfer(chamfer7_edges, length=CHAMFER7_SIZE)

    # Sketch17 → Cut-Extrude3 (cut)
    with BuildSketch(Plane.ZY.offset(-19.5)):
        Polygon((-90.658359214, 19.683281573), (-90.658359214, 26.683281573), (-83.658359214, 26.683281573), align=None)
    extrude(amount=-CUT_EXTRUDE3_DEPTH, mode=Mode.SUBTRACT)

    # Sketch18 → Boss-Extrude11 (add)
    with BuildSketch(Plane(origin=(0, 0, 0), x_dir=(1, 0, 0), z_dir=(0, 1, 0))):
        with Locations((4.5, 94)):
            Rectangle(SKETCH18_W, SKETCH18_H)
        with Locations((155.5, 94)):
            Rectangle(SKETCH18_W, SKETCH18_H)
    extrude(amount=BOSS_EXTRUDE11_DEPTH)

    # Sketch19 → Boss-Extrude12 (add)
    with BuildSketch(Plane(origin=(0, 30, 0), x_dir=(1, 0, 0), z_dir=(0, 1, 0))):
        Polygon((0, 96), (9, 96), (19.5, 96), (19.5, 92), (9, 92), (9, 0), (0, 0), align=None)
        with Locations((155.5, 48)):
            Rectangle(SKETCH19_W, SKETCH19_H)
    extrude(amount=BOSS_EXTRUDE12_DEPTH)


solid = part.part
